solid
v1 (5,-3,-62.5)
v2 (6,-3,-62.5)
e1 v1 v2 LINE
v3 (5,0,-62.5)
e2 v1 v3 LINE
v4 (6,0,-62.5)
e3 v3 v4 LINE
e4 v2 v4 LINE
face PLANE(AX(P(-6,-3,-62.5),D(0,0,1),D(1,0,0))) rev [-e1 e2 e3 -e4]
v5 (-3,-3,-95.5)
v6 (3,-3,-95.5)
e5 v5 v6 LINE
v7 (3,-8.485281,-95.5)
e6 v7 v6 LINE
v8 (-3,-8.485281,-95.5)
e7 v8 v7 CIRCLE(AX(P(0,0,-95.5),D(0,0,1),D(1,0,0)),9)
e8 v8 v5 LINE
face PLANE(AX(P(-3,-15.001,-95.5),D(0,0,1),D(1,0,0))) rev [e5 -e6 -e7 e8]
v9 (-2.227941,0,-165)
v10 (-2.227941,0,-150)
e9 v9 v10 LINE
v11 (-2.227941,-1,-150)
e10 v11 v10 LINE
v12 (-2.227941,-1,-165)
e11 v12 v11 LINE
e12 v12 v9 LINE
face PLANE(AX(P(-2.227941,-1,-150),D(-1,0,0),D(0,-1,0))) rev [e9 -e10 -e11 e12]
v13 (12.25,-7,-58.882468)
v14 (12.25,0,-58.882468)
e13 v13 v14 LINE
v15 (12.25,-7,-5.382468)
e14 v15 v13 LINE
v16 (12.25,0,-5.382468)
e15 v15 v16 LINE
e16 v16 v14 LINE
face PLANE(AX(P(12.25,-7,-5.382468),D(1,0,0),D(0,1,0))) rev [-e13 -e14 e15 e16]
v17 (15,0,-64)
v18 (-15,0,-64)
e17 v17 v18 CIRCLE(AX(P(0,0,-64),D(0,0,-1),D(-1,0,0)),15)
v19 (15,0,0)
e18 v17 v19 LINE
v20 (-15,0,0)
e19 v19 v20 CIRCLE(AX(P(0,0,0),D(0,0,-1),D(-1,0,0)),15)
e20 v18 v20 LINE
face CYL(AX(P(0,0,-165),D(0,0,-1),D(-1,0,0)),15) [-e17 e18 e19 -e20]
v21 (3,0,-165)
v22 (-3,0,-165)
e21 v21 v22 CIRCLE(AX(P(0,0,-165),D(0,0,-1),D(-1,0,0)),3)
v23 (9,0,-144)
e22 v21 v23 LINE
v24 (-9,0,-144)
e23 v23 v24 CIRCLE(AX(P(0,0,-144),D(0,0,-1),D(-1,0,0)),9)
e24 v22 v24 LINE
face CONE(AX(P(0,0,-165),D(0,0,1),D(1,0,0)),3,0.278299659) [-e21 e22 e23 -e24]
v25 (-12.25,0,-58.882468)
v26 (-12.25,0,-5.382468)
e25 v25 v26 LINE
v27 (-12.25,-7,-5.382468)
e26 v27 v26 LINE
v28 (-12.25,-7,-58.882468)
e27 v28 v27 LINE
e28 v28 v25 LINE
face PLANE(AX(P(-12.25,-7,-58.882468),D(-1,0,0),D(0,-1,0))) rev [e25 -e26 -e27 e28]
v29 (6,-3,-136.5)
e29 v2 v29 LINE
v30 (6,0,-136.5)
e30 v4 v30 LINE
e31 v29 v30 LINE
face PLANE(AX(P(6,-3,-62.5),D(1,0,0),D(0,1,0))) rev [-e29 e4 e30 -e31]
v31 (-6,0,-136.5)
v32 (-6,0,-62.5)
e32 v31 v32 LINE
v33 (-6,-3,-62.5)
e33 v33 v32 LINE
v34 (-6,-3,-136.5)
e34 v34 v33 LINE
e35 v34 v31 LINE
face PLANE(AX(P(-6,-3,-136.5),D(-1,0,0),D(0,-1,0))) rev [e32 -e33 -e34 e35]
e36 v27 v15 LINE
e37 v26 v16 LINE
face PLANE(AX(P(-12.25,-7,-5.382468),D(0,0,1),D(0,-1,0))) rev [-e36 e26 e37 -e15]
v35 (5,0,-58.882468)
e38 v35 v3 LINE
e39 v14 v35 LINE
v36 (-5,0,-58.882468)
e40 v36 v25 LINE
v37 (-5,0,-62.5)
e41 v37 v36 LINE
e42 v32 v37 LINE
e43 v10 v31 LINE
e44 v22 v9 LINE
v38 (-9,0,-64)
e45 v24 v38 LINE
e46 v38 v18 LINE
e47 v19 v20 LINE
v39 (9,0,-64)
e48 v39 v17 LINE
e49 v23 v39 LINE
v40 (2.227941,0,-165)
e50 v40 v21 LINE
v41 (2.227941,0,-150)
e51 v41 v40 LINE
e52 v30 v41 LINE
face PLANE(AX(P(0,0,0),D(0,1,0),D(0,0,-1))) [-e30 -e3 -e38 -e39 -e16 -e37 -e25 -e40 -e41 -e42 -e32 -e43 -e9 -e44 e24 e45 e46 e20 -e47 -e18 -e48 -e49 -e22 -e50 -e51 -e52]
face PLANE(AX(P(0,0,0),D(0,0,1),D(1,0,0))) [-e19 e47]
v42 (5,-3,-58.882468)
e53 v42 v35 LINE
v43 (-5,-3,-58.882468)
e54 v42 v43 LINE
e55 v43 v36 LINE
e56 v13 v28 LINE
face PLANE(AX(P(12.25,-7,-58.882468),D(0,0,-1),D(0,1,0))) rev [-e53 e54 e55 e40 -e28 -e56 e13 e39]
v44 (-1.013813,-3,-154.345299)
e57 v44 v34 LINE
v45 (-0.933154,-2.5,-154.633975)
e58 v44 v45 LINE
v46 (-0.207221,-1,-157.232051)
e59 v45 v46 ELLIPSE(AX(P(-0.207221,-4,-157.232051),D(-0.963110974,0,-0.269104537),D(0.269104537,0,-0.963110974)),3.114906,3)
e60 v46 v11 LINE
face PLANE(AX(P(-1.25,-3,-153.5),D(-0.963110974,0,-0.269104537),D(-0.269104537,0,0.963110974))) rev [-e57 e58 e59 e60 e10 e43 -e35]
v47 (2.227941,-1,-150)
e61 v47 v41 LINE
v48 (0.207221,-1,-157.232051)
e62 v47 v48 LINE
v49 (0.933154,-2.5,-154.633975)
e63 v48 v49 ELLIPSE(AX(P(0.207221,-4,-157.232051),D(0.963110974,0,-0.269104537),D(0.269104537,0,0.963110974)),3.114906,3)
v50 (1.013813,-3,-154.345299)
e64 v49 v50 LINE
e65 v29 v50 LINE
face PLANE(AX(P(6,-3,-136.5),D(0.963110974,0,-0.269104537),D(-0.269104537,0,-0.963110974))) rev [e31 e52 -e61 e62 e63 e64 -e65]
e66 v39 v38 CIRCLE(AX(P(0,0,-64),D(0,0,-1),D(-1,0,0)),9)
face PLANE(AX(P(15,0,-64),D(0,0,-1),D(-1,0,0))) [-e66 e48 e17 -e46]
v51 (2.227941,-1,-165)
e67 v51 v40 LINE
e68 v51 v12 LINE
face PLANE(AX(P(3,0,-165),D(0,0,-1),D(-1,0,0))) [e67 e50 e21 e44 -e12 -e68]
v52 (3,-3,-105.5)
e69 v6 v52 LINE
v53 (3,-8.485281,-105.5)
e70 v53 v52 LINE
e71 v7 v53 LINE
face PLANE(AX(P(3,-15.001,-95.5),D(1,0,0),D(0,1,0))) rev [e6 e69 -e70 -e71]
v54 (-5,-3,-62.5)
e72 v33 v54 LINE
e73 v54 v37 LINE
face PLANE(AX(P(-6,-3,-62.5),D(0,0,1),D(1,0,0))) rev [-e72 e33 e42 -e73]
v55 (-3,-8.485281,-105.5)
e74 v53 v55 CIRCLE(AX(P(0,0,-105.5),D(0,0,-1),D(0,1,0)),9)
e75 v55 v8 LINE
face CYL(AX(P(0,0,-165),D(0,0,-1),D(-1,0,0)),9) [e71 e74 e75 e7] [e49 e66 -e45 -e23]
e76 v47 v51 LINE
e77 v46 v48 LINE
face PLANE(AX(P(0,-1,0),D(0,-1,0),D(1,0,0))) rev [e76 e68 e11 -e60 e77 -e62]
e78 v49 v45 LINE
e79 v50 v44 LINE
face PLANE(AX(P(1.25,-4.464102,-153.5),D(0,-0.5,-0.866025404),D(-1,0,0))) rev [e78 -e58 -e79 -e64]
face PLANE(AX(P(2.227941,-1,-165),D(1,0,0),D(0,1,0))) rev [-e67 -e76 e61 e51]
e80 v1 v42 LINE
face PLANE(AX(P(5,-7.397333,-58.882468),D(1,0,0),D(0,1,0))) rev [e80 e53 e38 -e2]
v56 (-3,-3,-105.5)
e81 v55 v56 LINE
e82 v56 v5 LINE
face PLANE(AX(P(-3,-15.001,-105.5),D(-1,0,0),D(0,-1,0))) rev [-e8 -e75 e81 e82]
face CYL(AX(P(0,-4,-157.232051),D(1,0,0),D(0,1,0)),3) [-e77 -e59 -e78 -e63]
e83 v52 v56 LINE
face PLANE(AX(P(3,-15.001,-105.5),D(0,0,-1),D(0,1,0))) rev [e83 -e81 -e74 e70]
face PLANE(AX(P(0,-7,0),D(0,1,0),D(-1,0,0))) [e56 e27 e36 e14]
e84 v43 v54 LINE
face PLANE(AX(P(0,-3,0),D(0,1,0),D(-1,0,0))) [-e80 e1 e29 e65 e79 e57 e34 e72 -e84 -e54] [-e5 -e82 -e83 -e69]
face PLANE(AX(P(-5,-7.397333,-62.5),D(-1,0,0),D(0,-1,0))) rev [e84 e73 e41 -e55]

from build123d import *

# Parameters (mm, degrees)
REVOLVE1_ANGLE          = 180
SKETCH3_W               = 24.5
SKETCH3_H               = 53.5
CUT_EXTRUDE1_DEPTH      = 7
CUT_EXTRUDE2_DEPTH      = 3
SKETCH5_W               = 2.5
SKETCH5_H               = 3.617532458
CUT_EXTRUDE3_DEPTH      = 3
CUT_EXTRUDE4_REACH      = 168.114
CUT_EXTRUDE4_END_RADIUS = 9
SKETCH6_W               = 6
SKETCH6_H               = 10
SKETCH7_W               = 4.455882352
SKETCH7_H               = 15
CUT_EXTRUDE5_DEPTH      = 1
SKETCH8_W               = 5
SKETCH8_H               = 3.617532458
CUT_EXTRUDE6_DEPTH      = 3
CHAMFER10_SIZE          = 2
CHAMFER10_SIZE_2        = 3.464101615
FILLET1_R               = 3


with BuildPart() as part:
    # Sketch2 → Revolve1 (revolve)
    with BuildSketch(Plane(origin=(0, 0, 0), x_dir=(1, 0, 0), z_dir=(0, 1, 0))):
        Polygon((0, 0), (-15, 0), (-15, 64), (-9, 64), (-9, 144), (-3, 165), (0, 165), align=None)
    revolve(axis=Axis((0, 0, -165), (0, 0, 1)), revolution_arc=REVOLVE1_ANGLE)

    # Sketch3 → Cut-Extrude1 (cut)
    with BuildSketch(Plane(origin=(0, 0, 0), x_dir=(1, 0, 0), z_dir=(0, 1, 0))):
        with Locations((0, 32.132467542)):
            Rectangle(SKETCH3_W, SKETCH3_H)
    extrude(amount=-CUT_EXTRUDE1_DEPTH, mode=Mode.SUBTRACT)

    # Sketch4 → Cut-Extrude2 (cut)
    with BuildSketch(Plane(origin=(0, 0, 0), x_dir=(1, 0, 0), z_dir=(0, 1, 0))):
        Polygon((-6, 62.5), (6, 62.5), (6, 136.5), (1.25, 153.5), (-1.25, 153.5), (-6, 136.5), align=None)
    extrude(amount=-CUT_EXTRUDE2_DEPTH, mode=Mode.SUBTRACT)

    # Sketch5 → Cut-Extrude3 (cut)
    with BuildSketch(Plane(origin=(0, 0, 0), x_dir=(1, 0, 0), z_dir=(0, 1, 0))):
        with Locations((-3.75, 60.691233771)):
            Rectangle(SKETCH5_W, SKETCH5_H)
        with Locations((3.75, 60.691233771)):
            Rectangle(SKETCH5_W, SKETCH5_H)
    extrude(amount=-CUT_EXTRUDE3_DEPTH, mode=Mode.SUBTRACT)

    # Cut-Extrude4: up to this cylinder (the profile starts inside it)
    cut_extrude4_end = Plane(origin=(0, 0, -100.5), z_dir=(0, 0, -1)) * Cylinder(CUT_EXTRUDE4_END_RADIUS, 355.228, mode=Mode.PRIVATE)
    # Sketch6 → Cut-Extrude4 (cut, up to the surface)
    with BuildSketch(Plane(origin=(0, -3, 0), x_dir=(1, 0, 0), z_dir=(0, 1, 0)), mode=Mode.PRIVATE) as cut_extrude4_sk1:
        with Locations((0, 100.5)):
            Rectangle(SKETCH6_W, SKETCH6_H)
    cut_extrude4_tool1 = extrude(cut_extrude4_sk1.sketch, amount=-CUT_EXTRUDE4_REACH, mode=Mode.PRIVATE) & cut_extrude4_end
    add(cut_extrude4_tool1.solids().sort_by_distance((0, -3, -100.5))[0], mode=Mode.SUBTRACT)

    # Sketch7 → Cut-Extrude5 (cut)
    with BuildSketch(Plane(origin=(0, 0, 0), x_dir=(1, 0, 0), z_dir=(0, 1, 0))):
        with Locations((0, 157.5)):
            Rectangle(SKETCH7_W, SKETCH7_H)
    extrude(amount=-CUT_EXTRUDE5_DEPTH, mode=Mode.SUBTRACT)

    # Sketch8 → Cut-Extrude6 (cut)
    with BuildSketch(Plane(origin=(0, 0, 0), x_dir=(1, 0, 0), z_dir=(0, 1, 0))):
        with Locations((0, 60.691233771)):
            Rectangle(SKETCH8_W, SKETCH8_H)
    extrude(amount=-CUT_EXTRUDE6_DEPTH, mode=Mode.SUBTRACT)

    # Chamfer10
    # the kernel refuses this chamfer: 3.464101615, 2 mm, written as the material it takes off along each edge
    with BuildSketch(Plane(origin=(10.211927941, -1, -153.5), x_dir=(0, 0.05789386240267106, -0.9983227437537926), z_dir=(-1, 0, 0))) as chamfer10_piece_1_section:
        Polygon((CHAMFER10_SIZE * 0.998322743754, CHAMFER10_SIZE * 0.0578938624027), (-CHAMFER10_SIZE_2 * 0.057893862405, CHAMFER10_SIZE_2 * 0.998322743793), (0, 0), align=None)
    chamfer10_piece_1 = extrude(amount=20.423855882, mode=Mode.PRIVATE)
    chamfer10_piece_1 = split(chamfer10_piece_1, bisect_by=Plane(origin=(0, -3, -154.190565485), z_dir=(0, 1, 0)), keep=Keep.TOP, mode=Mode.PRIVATE)
    chamfer10_piece_1 = split(chamfer10_piece_1, bisect_by=Plane(origin=(-0.980499377, -1.889149357, -154.464528546), z_dir=(0.9631109740028581, 6.725367985932025e-15, 0.26910453685374025)), keep=Keep.TOP, mode=Mode.PRIVATE)
    chamfer10_piece_1 = split(chamfer10_piece_1, bisect_by=Plane(origin=(0.980499377, -1.889149357, -154.464528546), z_dir=(-0.9631109740028581, -6.725367985932025e-15, 0.26910453685374025)), keep=Keep.TOP, mode=Mode.PRIVATE)
    add(chamfer10_piece_1, mode=Mode.SUBTRACT)

    # Fillet1
    fillet1_edges = [part.edges().sort_by_distance(p)[0] for p in [
        (0, -1, -155.5),
    ]]
    fillet(fillet1_edges, radius=FILLET1_R)


solid = part.part
